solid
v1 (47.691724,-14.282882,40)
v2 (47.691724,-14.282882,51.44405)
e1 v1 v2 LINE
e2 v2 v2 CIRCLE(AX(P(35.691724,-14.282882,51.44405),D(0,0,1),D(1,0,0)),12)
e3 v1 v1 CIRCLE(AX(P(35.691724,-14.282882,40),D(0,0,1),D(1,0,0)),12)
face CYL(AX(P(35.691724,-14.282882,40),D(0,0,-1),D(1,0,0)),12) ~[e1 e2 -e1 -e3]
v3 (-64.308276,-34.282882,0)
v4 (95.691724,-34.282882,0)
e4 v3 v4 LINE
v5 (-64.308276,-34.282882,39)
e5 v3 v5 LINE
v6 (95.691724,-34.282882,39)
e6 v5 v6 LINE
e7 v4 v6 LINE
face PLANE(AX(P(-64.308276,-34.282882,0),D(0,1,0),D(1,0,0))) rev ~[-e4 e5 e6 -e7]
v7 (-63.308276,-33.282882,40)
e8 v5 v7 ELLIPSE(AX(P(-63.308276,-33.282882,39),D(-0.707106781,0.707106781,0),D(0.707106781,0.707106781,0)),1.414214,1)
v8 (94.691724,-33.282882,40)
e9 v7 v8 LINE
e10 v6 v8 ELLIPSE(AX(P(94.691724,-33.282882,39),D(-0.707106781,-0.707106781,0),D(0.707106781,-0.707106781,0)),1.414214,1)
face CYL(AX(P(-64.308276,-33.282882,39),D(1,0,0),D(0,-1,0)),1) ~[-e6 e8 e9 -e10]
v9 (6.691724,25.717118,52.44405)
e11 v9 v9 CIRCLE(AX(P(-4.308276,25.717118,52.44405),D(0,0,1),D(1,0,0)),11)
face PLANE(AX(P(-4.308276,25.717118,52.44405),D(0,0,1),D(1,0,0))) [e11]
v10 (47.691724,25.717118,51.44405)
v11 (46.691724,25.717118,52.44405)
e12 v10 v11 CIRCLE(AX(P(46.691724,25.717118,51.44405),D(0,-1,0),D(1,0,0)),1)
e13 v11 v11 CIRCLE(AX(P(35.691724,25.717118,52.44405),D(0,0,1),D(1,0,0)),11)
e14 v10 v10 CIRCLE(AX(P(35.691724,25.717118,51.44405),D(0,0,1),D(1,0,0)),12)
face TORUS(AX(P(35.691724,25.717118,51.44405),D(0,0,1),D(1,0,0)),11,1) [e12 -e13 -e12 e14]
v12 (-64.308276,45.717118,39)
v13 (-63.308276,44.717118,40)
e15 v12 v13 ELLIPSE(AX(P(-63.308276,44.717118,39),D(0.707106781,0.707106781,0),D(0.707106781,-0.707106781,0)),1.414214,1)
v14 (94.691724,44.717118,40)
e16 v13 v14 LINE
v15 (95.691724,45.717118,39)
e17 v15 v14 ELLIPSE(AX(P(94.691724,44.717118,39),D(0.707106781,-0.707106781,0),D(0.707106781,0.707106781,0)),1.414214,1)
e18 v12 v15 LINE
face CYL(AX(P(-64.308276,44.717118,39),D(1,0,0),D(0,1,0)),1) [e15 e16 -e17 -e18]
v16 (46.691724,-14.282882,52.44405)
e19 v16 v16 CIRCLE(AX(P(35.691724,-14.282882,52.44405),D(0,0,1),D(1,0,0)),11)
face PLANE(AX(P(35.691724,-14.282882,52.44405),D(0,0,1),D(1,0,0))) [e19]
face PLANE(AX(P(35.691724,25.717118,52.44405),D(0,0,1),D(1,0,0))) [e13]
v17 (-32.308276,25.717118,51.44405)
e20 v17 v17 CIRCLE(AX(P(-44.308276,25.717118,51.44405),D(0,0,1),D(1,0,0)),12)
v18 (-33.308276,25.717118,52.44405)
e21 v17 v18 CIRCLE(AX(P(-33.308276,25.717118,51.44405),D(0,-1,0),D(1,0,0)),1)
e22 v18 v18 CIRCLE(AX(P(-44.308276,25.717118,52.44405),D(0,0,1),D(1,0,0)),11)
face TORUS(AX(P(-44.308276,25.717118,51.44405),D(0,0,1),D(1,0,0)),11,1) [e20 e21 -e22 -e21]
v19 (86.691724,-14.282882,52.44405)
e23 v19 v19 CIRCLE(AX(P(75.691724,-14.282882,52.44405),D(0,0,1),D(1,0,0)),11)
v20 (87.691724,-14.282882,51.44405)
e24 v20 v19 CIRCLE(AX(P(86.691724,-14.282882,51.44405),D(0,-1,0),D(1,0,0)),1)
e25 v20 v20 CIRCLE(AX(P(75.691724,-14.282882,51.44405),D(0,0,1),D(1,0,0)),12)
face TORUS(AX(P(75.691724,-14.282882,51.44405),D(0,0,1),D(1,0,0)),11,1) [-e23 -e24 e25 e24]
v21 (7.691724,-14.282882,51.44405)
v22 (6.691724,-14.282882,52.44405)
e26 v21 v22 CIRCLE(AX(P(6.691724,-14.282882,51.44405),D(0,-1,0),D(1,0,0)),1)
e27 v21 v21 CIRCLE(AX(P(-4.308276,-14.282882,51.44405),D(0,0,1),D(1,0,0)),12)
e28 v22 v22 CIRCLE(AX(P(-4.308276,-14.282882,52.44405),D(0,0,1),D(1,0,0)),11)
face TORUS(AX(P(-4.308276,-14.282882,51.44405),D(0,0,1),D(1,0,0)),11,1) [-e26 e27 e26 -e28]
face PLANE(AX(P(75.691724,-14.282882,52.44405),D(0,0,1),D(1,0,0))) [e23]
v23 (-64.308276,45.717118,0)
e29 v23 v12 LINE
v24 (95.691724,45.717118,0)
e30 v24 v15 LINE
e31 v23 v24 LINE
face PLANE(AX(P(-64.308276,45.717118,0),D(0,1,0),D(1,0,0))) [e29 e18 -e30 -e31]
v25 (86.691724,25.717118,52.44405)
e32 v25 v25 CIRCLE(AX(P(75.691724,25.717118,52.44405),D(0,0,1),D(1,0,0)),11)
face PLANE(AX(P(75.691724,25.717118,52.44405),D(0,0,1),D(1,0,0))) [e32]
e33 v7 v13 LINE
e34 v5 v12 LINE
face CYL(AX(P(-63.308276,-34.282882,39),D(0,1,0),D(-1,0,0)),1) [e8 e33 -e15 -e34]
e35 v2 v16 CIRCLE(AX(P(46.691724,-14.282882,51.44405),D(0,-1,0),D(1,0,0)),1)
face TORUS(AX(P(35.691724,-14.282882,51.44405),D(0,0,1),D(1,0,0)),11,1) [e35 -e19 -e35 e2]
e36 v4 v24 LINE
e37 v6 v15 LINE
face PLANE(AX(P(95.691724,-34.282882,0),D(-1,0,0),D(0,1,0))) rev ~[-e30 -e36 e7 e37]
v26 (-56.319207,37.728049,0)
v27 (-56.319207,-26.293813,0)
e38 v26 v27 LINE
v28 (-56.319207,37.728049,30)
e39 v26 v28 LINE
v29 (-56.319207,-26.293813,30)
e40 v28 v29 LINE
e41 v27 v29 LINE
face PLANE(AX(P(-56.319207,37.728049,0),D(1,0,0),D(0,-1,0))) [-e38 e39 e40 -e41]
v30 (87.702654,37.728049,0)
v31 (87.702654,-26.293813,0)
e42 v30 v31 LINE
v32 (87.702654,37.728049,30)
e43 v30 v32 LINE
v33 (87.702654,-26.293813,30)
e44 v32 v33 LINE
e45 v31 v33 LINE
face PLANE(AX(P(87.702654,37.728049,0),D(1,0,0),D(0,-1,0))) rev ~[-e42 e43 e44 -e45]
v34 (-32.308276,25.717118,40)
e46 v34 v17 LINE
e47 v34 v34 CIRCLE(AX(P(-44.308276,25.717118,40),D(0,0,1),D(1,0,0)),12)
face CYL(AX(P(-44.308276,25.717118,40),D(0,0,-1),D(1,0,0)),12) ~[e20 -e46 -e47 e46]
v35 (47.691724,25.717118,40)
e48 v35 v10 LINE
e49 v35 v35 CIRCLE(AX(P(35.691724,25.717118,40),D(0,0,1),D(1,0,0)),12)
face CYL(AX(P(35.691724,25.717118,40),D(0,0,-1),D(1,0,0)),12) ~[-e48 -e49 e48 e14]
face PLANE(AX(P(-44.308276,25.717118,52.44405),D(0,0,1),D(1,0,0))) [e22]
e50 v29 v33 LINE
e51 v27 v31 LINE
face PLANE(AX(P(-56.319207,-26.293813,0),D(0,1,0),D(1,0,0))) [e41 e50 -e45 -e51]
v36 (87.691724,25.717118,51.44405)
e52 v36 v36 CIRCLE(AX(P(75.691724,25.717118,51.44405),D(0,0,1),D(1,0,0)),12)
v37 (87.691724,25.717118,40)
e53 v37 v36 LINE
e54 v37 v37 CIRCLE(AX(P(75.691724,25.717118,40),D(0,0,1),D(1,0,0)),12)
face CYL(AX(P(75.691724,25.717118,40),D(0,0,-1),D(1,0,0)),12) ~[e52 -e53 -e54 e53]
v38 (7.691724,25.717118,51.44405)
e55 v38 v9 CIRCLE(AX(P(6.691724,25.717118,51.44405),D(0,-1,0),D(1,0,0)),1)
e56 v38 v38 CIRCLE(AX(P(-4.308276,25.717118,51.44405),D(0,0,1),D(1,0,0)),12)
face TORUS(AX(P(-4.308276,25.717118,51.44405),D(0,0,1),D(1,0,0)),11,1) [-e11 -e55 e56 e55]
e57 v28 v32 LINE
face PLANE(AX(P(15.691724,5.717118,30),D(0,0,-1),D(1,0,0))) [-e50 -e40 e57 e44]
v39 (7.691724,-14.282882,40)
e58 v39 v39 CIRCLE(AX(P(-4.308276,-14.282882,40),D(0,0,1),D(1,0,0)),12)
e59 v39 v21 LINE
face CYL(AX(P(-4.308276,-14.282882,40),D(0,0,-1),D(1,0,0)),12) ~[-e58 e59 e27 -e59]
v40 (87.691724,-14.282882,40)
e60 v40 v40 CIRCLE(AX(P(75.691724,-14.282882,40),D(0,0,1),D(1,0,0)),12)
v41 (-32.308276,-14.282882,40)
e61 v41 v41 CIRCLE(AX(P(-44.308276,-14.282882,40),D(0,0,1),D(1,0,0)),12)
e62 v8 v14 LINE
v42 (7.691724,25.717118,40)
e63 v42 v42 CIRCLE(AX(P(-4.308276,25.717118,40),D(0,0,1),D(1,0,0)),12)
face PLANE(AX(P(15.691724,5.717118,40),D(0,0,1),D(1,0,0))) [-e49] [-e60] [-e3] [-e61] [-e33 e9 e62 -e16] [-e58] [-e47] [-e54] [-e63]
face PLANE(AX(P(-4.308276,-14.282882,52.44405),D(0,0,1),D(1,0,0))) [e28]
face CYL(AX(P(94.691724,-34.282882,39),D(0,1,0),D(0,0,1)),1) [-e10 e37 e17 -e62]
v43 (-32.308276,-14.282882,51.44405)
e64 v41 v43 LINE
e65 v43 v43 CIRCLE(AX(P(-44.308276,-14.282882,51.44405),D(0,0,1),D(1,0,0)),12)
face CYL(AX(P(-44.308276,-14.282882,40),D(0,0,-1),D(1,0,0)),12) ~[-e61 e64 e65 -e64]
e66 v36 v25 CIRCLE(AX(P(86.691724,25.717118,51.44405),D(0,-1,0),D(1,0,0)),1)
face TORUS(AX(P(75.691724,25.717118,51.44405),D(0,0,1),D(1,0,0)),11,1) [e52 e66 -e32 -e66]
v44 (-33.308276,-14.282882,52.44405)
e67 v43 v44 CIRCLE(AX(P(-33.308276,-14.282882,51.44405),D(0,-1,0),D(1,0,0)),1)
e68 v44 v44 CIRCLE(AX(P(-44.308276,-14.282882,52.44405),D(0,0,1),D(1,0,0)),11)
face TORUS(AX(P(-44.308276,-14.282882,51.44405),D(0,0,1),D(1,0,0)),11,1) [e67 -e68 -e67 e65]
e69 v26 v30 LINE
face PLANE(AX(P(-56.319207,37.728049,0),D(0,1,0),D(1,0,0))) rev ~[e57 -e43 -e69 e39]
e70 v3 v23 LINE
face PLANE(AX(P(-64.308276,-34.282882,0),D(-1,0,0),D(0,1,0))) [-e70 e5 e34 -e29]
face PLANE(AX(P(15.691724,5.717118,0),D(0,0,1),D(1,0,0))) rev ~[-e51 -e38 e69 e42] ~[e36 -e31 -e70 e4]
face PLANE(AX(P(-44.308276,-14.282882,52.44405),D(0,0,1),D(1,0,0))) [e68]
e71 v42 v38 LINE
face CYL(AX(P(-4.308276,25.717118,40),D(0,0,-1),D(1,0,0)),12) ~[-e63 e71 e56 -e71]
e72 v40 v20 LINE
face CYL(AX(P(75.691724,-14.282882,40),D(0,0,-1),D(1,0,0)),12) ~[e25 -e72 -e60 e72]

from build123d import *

# Parameters (mm, degrees)
F0_W     = 160
F0_H     = 80
F1_DEPTH = 40
F2_W     = 144.0218614806
F2_H     = 64.0218614806
F3_DEPTH = 30
F5_R     = 1
F4_R     = 12
F6_DEPTH = 12.44405
F7_R     = 1
F8_R     = 1
F9_R     = 1
F10_R    = 1
F11_R    = 1
F12_R    = 1
F13_R    = 1
F14_R    = 1


with BuildPart() as f1:
    # F0 (on Top) → F1 (new body)
    with BuildSketch(Plane.XY):
        with Locations((15.6917236745, 5.7171181207)):
            Rectangle(F0_W, F0_H)
    extrude(amount=F1_DEPTH)

    # F2 (on face) → F3 (cut)
    with BuildSketch(Plane(origin=(0, 0, 0), x_dir=(1, 0, 0), z_dir=(0, 0, -1))):
        with Locations((15.6917236745, -5.7171181207)):
            Rectangle(F2_W, F2_H)
    extrude(amount=-F3_DEPTH, mode=Mode.SUBTRACT)

    # F5
    f5_edges = [f1.edges().sort_by_distance(p)[0] for p in [
        (15.691724, 45.717118, 40),
        (-64.308276, 5.717118, 40),
        (15.691724, -34.282882, 40),
        (95.691724, 5.717118, 40),
    ]]
    fillet(f5_edges, radius=F5_R)

    # F4 (on face) → F6 (join)
    with BuildSketch(Plane.XY.offset(40)):
        with Locations((-44.3082763255, -14.2828818793)):
            Circle(F4_R)
        with Locations((-4.3082763255, -14.2828818793)):
            Circle(F4_R)
        with Locations((35.6917236745, -14.2828818793)):
            Circle(F4_R)
        with Locations((75.6917236745, -14.2828818793)):
            Circle(F4_R)
        with Locations((75.6917236745, 25.7171181207)):
            Circle(F4_R)
        with Locations((35.6917236745, 25.7171181207)):
            Circle(F4_R)
        with Locations((-4.3082763255, 25.7171181207)):
            Circle(F4_R)
        with Locations((-44.3082763255, 25.7171181207)):
            Circle(F4_R)
    extrude(amount=F6_DEPTH)

    # F7
    f7_edges = [f1.edges().sort_by_distance(p)[0] for p in [
        (-56.308276, 25.717118, 52.44405),
    ]]
    fillet(f7_edges, radius=F7_R)

    # F8
    f8_edges = [f1.edges().sort_by_distance(p)[0] for p in [
        (-16.308276, 25.717118, 52.44405),
    ]]
    fillet(f8_edges, radius=F8_R)

    # F9
    f9_edges = [f1.edges().sort_by_distance(p)[0] for p in [
        (23.691724, 25.717118, 52.44405),
    ]]
    fillet(f9_edges, radius=F9_R)

    # F10
    f10_edges = [f1.edges().sort_by_distance(p)[0] for p in [
        (63.691724, 25.717118, 52.44405),
    ]]
    fillet(f10_edges, radius=F10_R)

    # F11
    f11_edges = [f1.edges().sort_by_distance(p)[0] for p in [
        (-56.308276, -14.282882, 52.44405),
    ]]
    fillet(f11_edges, radius=F11_R)

    # F12
    f12_edges = [f1.edges().sort_by_distance(p)[0] for p in [
        (-16.308276, -14.282882, 52.44405),
    ]]
    fillet(f12_edges, radius=F12_R)

    # F13
    f13_edges = [f1.edges().sort_by_distance(p)[0] for p in [
        (23.691724, -14.282882, 52.44405),
    ]]
    fillet(f13_edges, radius=F13_R)

    # F14
    f14_edges = [f1.edges().sort_by_distance(p)[0] for p in [
        (63.691724, -14.282882, 52.44405),
    ]]
    fillet(f14_edges, radius=F14_R)


solid = f1.part
